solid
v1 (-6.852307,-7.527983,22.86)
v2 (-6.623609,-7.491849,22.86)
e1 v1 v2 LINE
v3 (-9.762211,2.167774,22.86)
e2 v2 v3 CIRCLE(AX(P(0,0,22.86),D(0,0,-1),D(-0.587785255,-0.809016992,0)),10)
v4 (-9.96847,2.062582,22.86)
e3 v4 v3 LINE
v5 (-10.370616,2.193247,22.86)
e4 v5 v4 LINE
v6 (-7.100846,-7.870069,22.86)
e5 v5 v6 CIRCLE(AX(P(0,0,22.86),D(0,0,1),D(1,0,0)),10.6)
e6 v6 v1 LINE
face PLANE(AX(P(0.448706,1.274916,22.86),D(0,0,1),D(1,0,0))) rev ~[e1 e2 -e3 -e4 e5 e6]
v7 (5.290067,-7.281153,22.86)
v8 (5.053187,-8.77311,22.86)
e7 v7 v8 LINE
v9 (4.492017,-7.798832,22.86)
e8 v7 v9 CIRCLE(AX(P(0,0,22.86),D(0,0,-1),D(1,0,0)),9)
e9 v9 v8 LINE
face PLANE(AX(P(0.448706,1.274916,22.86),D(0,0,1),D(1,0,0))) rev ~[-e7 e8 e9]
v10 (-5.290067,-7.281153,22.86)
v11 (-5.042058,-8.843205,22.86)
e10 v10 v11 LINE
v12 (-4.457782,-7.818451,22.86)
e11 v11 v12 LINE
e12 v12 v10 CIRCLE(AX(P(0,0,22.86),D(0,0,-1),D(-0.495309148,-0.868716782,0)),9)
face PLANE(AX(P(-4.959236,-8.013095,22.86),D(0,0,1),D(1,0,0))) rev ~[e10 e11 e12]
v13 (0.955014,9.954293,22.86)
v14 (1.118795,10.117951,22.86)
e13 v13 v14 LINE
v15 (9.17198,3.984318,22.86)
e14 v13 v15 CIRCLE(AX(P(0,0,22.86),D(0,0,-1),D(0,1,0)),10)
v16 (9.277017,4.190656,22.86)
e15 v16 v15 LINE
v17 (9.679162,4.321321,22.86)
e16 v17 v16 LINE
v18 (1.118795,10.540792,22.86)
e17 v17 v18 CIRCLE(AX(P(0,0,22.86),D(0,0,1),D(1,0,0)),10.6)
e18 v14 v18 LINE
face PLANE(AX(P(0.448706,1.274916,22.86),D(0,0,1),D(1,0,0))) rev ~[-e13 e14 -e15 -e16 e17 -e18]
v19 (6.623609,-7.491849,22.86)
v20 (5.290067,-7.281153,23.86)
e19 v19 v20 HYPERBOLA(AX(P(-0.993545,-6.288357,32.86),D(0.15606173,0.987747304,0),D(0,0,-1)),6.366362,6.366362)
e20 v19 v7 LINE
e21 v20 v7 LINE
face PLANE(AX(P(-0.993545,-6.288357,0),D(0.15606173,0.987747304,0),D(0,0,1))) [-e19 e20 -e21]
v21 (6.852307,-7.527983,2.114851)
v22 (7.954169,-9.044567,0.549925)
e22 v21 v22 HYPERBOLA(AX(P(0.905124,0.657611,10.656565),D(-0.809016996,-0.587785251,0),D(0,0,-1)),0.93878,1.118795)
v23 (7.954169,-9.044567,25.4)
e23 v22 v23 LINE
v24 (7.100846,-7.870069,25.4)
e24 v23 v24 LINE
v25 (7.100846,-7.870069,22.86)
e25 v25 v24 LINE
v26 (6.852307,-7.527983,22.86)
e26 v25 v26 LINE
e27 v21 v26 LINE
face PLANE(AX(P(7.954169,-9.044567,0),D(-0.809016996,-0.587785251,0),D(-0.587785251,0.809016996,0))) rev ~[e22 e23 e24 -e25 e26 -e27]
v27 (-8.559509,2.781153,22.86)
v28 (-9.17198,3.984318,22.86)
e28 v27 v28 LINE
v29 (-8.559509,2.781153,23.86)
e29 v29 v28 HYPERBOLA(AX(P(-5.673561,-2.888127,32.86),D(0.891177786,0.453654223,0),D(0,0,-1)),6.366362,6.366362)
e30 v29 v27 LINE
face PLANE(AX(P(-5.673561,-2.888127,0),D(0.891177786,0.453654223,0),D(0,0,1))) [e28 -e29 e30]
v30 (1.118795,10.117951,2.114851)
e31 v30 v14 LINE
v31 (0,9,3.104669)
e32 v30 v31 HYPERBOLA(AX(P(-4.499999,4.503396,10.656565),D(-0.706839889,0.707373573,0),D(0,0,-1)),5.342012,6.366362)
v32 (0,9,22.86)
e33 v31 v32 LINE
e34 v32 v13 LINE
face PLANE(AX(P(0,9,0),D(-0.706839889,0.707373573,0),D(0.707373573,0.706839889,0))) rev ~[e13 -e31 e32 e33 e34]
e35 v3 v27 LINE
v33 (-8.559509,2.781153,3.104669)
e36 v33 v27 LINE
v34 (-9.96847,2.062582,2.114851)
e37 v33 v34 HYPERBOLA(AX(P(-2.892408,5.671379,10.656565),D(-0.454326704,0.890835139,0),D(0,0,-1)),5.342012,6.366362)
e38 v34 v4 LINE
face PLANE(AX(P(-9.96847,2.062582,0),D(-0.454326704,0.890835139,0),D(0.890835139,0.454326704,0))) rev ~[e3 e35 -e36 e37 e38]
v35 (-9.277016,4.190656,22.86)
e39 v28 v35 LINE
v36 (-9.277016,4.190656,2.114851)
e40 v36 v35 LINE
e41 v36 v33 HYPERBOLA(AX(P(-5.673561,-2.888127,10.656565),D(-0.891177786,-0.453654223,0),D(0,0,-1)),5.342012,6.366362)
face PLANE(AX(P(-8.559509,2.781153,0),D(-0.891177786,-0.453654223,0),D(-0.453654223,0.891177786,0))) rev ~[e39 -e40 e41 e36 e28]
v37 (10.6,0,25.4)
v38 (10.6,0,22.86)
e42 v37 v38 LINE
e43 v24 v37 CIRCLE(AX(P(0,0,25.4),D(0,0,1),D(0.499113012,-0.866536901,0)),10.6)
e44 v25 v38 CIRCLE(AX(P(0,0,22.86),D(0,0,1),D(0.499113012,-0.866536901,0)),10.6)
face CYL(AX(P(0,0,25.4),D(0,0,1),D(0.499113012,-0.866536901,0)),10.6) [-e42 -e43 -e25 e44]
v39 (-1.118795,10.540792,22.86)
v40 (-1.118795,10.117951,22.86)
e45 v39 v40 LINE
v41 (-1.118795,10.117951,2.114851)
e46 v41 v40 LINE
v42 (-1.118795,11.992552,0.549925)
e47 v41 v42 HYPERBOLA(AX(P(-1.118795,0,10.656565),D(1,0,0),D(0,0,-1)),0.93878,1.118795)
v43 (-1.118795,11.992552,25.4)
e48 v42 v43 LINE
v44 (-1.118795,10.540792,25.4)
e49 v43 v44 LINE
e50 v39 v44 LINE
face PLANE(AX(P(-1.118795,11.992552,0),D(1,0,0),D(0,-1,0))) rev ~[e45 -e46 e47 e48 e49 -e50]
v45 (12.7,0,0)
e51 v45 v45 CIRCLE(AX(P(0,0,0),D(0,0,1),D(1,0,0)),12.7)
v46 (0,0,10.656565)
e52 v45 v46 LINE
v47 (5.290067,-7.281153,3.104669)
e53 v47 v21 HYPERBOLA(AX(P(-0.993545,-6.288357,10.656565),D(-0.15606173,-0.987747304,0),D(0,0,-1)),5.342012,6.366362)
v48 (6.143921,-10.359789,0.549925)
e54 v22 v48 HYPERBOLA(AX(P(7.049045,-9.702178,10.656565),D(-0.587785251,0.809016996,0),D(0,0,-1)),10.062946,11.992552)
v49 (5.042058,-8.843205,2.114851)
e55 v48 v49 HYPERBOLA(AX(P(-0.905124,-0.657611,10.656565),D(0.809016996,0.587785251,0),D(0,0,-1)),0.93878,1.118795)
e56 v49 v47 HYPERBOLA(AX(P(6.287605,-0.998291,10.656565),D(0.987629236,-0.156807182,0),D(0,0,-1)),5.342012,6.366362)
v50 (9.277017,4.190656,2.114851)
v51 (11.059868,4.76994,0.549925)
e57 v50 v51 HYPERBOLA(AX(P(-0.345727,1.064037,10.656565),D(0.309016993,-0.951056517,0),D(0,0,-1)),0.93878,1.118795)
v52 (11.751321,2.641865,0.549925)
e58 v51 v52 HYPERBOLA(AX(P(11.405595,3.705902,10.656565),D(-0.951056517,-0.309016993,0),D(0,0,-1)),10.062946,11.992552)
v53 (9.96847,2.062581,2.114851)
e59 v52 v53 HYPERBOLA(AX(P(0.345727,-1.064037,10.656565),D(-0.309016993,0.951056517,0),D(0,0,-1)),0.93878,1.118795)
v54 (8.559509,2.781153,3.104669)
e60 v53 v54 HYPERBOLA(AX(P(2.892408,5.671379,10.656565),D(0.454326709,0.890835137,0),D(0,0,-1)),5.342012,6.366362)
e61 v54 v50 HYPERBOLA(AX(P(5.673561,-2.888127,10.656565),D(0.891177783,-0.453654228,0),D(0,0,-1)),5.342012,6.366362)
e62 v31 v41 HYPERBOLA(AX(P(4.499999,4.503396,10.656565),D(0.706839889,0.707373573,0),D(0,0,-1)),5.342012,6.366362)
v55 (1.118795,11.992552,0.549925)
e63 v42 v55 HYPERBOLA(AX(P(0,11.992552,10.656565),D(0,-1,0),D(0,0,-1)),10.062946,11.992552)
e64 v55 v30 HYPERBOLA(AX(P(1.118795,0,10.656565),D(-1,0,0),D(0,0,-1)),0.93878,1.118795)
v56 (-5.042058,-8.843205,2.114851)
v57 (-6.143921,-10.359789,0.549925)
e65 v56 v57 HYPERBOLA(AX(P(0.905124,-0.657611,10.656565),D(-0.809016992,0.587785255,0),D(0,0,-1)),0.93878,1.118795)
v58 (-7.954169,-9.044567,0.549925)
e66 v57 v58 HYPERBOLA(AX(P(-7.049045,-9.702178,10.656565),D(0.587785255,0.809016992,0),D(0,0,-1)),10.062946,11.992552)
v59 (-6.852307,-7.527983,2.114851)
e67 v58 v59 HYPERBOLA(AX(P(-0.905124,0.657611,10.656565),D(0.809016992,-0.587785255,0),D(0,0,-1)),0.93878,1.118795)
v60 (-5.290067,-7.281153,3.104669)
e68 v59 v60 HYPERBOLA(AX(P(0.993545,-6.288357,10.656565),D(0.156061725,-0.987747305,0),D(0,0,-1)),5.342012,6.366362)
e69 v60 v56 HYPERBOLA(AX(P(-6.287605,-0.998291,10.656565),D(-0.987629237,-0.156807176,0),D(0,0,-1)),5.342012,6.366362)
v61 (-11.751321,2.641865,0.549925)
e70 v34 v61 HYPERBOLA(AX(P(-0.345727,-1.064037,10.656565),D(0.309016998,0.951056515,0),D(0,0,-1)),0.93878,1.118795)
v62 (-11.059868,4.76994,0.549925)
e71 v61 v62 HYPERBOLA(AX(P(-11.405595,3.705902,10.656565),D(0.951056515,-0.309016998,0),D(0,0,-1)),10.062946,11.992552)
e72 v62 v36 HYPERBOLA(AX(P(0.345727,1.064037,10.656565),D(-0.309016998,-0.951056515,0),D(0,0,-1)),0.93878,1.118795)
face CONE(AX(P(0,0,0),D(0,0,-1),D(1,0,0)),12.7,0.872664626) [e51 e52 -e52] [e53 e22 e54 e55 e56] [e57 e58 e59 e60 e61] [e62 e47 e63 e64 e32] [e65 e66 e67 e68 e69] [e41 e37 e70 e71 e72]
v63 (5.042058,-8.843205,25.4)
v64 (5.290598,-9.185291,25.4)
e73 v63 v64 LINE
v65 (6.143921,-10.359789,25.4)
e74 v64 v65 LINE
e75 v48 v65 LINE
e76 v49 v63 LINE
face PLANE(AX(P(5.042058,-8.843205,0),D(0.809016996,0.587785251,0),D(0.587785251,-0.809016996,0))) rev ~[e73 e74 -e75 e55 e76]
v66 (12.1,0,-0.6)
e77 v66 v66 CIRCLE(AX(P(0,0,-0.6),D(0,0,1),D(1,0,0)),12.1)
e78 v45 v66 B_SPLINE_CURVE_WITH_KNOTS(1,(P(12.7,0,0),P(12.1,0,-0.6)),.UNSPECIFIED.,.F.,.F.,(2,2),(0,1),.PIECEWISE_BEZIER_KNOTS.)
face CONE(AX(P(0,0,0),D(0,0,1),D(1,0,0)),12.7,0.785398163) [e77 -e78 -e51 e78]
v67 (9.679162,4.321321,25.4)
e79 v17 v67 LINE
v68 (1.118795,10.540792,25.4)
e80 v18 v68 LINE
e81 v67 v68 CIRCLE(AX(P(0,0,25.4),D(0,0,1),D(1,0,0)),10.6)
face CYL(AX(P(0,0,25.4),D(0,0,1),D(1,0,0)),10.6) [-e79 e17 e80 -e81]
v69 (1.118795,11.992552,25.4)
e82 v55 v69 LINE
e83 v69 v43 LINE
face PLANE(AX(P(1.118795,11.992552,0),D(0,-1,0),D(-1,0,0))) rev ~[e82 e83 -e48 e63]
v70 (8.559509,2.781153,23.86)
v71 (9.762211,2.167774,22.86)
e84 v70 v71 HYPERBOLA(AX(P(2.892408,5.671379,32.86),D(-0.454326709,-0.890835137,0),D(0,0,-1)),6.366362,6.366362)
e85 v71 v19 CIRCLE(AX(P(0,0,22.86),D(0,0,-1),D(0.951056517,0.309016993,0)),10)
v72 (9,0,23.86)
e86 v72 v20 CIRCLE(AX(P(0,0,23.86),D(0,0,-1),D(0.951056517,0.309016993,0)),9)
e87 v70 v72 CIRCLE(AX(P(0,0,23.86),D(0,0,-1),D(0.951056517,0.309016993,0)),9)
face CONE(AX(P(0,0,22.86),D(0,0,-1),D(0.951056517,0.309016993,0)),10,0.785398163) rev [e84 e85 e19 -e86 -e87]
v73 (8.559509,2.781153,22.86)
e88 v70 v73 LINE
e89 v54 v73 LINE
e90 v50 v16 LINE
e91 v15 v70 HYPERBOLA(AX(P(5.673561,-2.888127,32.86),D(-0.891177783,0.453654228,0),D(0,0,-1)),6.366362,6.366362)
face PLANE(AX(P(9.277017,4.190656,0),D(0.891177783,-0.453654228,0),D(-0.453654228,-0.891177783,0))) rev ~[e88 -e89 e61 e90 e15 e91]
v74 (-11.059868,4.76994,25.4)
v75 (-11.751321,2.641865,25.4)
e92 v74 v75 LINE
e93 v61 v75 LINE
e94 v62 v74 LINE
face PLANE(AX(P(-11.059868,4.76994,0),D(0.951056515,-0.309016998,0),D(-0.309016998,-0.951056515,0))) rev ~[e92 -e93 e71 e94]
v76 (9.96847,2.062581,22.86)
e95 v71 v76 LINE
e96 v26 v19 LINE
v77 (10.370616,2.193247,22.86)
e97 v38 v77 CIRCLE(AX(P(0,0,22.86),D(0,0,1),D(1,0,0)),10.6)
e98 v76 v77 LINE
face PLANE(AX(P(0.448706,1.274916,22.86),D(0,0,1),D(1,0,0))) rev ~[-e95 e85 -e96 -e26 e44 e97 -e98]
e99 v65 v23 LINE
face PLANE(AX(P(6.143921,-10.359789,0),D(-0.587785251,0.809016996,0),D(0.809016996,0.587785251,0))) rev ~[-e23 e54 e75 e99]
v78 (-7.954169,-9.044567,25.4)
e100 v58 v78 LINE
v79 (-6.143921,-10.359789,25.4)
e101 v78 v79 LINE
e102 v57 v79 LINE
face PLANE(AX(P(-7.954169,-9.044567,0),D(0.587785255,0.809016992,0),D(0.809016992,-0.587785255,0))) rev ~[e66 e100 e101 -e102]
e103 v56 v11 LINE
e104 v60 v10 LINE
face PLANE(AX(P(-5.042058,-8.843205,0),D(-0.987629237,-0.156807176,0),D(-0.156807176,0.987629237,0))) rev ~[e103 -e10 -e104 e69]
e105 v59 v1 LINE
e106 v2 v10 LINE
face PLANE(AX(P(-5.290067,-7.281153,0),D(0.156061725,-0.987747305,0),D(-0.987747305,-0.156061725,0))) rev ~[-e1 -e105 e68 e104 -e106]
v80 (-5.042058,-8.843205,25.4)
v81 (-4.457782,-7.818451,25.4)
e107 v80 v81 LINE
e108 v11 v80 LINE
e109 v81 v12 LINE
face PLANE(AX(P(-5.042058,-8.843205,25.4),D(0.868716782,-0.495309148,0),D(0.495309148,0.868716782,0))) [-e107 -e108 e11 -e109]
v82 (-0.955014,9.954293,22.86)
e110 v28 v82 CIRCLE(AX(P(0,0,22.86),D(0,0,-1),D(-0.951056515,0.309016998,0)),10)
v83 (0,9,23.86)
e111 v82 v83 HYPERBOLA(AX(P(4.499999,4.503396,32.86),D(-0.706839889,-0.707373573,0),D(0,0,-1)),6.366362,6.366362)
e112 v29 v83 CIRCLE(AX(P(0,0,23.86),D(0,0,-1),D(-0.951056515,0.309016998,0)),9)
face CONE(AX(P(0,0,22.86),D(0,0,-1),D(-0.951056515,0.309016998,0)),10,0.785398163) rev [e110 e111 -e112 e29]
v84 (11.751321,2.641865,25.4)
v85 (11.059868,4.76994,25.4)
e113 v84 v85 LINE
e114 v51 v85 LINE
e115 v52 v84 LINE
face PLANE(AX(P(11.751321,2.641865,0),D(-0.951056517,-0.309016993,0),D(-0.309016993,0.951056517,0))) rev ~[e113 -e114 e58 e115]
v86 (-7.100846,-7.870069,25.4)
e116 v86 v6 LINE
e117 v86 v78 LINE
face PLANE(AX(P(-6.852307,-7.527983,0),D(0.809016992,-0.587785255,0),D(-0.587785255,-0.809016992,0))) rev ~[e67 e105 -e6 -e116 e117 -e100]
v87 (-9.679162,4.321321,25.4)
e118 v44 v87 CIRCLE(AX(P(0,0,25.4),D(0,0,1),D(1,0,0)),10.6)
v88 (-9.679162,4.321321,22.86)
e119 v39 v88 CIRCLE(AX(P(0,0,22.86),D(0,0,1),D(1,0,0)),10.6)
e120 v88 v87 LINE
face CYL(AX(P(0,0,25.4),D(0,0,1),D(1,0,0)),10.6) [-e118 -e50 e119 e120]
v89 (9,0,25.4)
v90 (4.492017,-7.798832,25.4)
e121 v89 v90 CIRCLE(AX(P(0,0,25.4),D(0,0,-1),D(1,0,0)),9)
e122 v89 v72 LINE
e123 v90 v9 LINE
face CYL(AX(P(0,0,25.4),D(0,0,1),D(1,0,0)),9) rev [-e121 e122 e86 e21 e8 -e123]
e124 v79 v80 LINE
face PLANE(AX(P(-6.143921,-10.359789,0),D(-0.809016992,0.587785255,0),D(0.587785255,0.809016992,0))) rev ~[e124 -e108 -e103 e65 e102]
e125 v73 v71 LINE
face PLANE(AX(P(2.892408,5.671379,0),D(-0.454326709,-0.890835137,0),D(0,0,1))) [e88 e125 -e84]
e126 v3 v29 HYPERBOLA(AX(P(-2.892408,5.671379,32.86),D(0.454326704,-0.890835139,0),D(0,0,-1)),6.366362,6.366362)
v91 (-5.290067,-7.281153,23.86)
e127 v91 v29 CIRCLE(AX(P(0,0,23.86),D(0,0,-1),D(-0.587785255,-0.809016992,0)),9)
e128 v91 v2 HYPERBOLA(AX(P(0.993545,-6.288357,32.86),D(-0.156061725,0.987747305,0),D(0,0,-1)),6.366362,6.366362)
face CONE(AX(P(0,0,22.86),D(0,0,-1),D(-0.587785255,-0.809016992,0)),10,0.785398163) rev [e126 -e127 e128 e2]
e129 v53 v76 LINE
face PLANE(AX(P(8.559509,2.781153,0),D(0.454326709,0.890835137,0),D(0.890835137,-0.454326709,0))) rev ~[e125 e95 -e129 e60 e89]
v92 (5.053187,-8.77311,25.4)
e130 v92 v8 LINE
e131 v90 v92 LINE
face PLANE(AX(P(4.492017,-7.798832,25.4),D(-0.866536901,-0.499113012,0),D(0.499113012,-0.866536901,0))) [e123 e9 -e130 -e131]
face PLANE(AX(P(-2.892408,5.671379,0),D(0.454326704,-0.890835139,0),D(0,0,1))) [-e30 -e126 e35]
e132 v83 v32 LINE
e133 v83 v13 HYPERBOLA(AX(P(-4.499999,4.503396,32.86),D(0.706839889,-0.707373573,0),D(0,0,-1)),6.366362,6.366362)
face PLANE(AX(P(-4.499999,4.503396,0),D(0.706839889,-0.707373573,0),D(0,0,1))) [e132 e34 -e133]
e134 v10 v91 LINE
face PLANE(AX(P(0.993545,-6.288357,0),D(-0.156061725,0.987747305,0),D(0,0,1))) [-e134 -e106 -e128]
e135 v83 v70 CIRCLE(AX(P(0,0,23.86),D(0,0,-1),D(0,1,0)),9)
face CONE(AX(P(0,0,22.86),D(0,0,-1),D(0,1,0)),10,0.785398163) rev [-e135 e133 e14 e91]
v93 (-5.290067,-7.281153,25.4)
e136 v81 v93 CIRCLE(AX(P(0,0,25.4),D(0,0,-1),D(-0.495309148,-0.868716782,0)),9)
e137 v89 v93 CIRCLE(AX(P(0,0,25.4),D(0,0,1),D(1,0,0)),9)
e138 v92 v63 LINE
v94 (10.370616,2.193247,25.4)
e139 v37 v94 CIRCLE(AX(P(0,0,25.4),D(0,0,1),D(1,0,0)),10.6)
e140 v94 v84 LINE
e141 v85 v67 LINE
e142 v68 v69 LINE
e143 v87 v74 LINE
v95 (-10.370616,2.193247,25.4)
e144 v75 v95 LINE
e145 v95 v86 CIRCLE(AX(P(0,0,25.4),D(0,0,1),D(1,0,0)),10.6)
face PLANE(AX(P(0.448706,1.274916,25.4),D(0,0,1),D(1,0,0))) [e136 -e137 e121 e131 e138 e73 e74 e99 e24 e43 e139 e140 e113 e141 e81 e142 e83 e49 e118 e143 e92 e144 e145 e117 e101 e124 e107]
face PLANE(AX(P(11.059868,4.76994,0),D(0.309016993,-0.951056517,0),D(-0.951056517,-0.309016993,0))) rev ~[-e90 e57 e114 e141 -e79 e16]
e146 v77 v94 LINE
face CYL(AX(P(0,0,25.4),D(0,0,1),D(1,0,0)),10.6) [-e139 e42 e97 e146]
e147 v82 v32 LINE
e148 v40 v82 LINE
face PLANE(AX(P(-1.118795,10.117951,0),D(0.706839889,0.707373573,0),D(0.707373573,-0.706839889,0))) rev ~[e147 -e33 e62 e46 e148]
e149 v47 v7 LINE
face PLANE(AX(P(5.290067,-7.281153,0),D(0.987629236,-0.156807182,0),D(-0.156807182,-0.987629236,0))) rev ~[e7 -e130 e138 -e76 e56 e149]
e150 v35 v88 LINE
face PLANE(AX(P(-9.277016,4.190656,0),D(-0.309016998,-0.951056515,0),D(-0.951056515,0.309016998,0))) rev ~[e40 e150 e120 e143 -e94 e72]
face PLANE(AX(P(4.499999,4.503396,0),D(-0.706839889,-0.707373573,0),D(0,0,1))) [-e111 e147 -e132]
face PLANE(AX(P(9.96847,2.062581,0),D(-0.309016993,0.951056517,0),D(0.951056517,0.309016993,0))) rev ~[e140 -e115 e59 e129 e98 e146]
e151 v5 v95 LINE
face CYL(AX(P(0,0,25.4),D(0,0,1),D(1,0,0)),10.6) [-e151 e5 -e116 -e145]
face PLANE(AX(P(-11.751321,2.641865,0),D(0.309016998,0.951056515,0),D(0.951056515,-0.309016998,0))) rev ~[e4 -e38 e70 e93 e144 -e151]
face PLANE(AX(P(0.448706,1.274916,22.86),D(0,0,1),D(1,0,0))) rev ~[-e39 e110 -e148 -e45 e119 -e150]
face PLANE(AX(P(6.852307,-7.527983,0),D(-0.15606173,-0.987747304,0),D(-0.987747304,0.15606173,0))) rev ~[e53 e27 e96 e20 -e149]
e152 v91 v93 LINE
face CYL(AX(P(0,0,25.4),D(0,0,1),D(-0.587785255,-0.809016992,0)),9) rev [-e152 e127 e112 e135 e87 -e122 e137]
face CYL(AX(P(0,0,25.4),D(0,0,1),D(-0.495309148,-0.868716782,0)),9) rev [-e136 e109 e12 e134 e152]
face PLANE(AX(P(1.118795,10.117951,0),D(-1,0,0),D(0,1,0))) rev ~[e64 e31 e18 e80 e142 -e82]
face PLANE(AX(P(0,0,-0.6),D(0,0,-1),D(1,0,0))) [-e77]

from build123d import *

# Parameters (mm, degrees)
F3_DEPTH     = 25.4
F5_DEPTH     = 2.54
F1_FACE_R    = 12.7
F6_DEPTH     = 0.6
F6_TAPER     = 45
F7_T4_ANGLE  = 71.9999997561
F7_T10_ANGLE = 72.000000061
F7_T16_ANGLE = 72.000000061
F7_T22_ANGLE = 72.000000061


# Not quite as in the source:
# - a fillet or chamfer that OpenCascade refuses, or shapes differently, is made with other operations: its cross-section is extruded or revolved along the edge and cut away or added


with BuildPart() as f1:
    # F0 (on Front) → F1 (revolve)
    with BuildSketch(Plane.XZ):
        Polygon((0, 10.656565316), (0, 0), (12.7, 0), align=None)
    revolve(axis=Axis((0, 0, 24.9413493462), (0, 0, 1)))

    # F2 (on Top) → F3 (join)
    with BuildSketch(Plane.XY):
        Polygon((-9.9684698397, 2.0625815326), (-8.5595086348, 2.7811529858), (-9.2770164791, 4.1906561266), (-11.0598678693, 4.7699396671), (-11.7513212299, 2.6418650731), align=None)
        Polygon((-1.1187950245, 10.1179509397), (0, 9), (1.1187950245, 10.1179509397), (1.1187950245, 11.9925518305), (-1.1187950245, 11.9925518305), align=None)
        Polygon((9.2770165014, 4.1906560772), (8.5595086496, 2.7811529403), (9.9684698507, 2.0625814795), (11.751321244, 2.6418650106), (11.0598678947, 4.7699396082), align=None)
        Polygon((6.8523065178, -7.5279830573), (5.2900672551, -7.2811529606), (5.0420581389, -8.8432054849), (6.1439208932, -10.3597894656), (7.9541692721, -9.044567038), align=None)
        Polygon((-5.0420581859, -8.8432054581), (-5.2900672939, -7.2811529325), (-6.8523065578, -7.5279830208), (-7.9541693202, -9.0445669956), (-6.1439209483, -10.3597894329), align=None)
    extrude(amount=F3_DEPTH)

    # F4 (on face) → F5 (join)
    with BuildSketch(Plane.XY.offset(25.4)):
        with BuildLine():
            ThreePointArc((-5.2900672939, -7.2811529325), (-4.0859144849, 8.0190587242), (9, 0))
            ThreePointArc((9, 0), (7.7919238303, -4.5039896783), (4.4920171062, -7.7988321124))
            Line((4.4920171062, -7.7988321124), (5.2905979251, -9.1852911546))
            ThreePointArc((5.2905979251, -9.1852911546), (9.1771547335, -5.3046989544), (10.6, 0))
            ThreePointArc((10.6, 0), (-4.306450321, 9.6857878168), (-7.1008463458, -7.8700686892))
            Line((-7.1008463458, -7.8700686892), (-6.8523065578, -7.5279830208))
            Line((-6.8523065578, -7.5279830208), (-5.2900672939, -7.2811529325))
        make_face()
        with BuildLine():
            ThreePointArc((-4.457782334, -7.8184510399), (-4.8813231204, -7.5612621033), (-5.2900672939, -7.2811529325))
            Line((-5.2900672939, -7.2811529325), (-5.0420581859, -8.8432054581))
            Line((-5.0420581859, -8.8432054581), (-4.457782334, -7.8184510399))
        make_face()
    extrude(amount=-F5_DEPTH)

    # F1_face (on face) → F6 (join)
    with BuildSketch(Plane(origin=(0, 0, 0), x_dir=(1, 0, 0), z_dir=(0, 0, -1))):
        Circle(F1_FACE_R)
    extrude(amount=F6_DEPTH, taper=F6_TAPER)

    # F7: chamfer of 1 on 4 edges, made by hand


with BuildPart() as f7_tool2:
    # F7_s3 → F7_t4 (revolve)
    with BuildSketch(Plane(origin=(0, 0, 0), x_dir=(0, 0, 1), z_dir=(-0.3090169984, -0.951056515, 0))):
        Polygon((22.86, 10), (23.86, 9), (22.86, 9), align=None)
    revolve(axis=Axis((0, 0, 22.86), (0, 0, -1)), revolution_arc=F7_T4_ANGLE)

    split(bisect_by=Plane(origin=(4.4999987183, 4.5033963456, 0), x_dir=(0, 0, 1), z_dir=(-0.7068398887, -0.707373573, 0)), keep=Keep.TOP)

    split(bisect_by=Plane(origin=(-5.6735605309, -2.888127077, 0), x_dir=(0, 0, 1), z_dir=(0.8911777859, 0.4536542229, 0)), keep=Keep.TOP)


with BuildPart() as f1_1:
    add(f1.part)

    # F7_t1: cut F7_tool2
    add(f7_tool2.part, mode=Mode.SUBTRACT)


with BuildPart() as f7_tool8:
    # F7_s9 → F7_t10 (revolve)
    with BuildSketch(Plane(origin=(0, 0, 0), x_dir=(0, 0, 1), z_dir=(0.8090169925, -0.5877852549, 0))):
        Polygon((22.86, 10), (23.86, 9), (22.86, 9), align=None)
    revolve(axis=Axis((0, 0, 22.86), (0, 0, -1)), revolution_arc=F7_T10_ANGLE)

    split(bisect_by=Plane(origin=(-2.8924083372, 5.6713791199, 0), x_dir=(0, 0, 1), z_dir=(0.4543267043, -0.8908351395, 0)), keep=Keep.TOP)

    split(bisect_by=Plane(origin=(0.9935454605, -6.2883570612, 0), x_dir=(0, 0, 1), z_dir=(-0.1560617251, 0.9877473047, 0)), keep=Keep.TOP)


with BuildPart() as f1_2:
    add(f1_1.part)

    # F7_t7: cut F7_tool8
    add(f7_tool8.part, mode=Mode.SUBTRACT)


with BuildPart() as f7_tool14:
    # F7_s15 → F7_t16 (revolve)
    with BuildSketch(Plane.YZ):
        Polygon((10, 22.86), (9, 23.86), (9, 22.86), align=None)
    revolve(axis=Axis((0, 0, 22.86), (0, 0, -1)), revolution_arc=F7_T16_ANGLE)

    split(bisect_by=Plane(origin=(5.6735605155, -2.8881271072, 0), x_dir=(0, 0, 1), z_dir=(-0.8911777835, 0.4536542277, 0)), keep=Keep.TOP)

    split(bisect_by=Plane(origin=(-4.4999987183, 4.5033963456, 0), x_dir=(0, 0, 1), z_dir=(0.7068398887, -0.707373573, 0)), keep=Keep.TOP)


with BuildPart() as f1_3:
    add(f1_2.part)

    # F7_t13: cut F7_tool14
    add(f7_tool14.part, mode=Mode.SUBTRACT)


with BuildPart() as f7_tool20:
    # F7_s21 → F7_t22 (revolve)
    with BuildSketch(Plane(origin=(0, 0, 0), x_dir=(0, 0, 1), z_dir=(-0.3090169934, 0.9510565166, 0))):
        Polygon((22.86, 10), (23.86, 9), (22.86, 9), align=None)
    revolve(axis=Axis((0, 0, 22.86), (0, 0, -1)), revolution_arc=F7_T22_ANGLE)

    split(bisect_by=Plane(origin=(2.8924083674, 5.6713791045, 0), x_dir=(0, 0, 1), z_dir=(-0.4543267091, -0.8908351371, 0)), keep=Keep.TOP)

    split(bisect_by=Plane(origin=(-0.993545494, -6.2883570559, 0), x_dir=(0, 0, 1), z_dir=(0.1560617303, 0.9877473039, 0)), keep=Keep.TOP)


with BuildPart() as f1_4:
    add(f1_3.part)

    # F7_t19: cut F7_tool20
    add(f7_tool20.part, mode=Mode.SUBTRACT)


solid = f1_4.part
